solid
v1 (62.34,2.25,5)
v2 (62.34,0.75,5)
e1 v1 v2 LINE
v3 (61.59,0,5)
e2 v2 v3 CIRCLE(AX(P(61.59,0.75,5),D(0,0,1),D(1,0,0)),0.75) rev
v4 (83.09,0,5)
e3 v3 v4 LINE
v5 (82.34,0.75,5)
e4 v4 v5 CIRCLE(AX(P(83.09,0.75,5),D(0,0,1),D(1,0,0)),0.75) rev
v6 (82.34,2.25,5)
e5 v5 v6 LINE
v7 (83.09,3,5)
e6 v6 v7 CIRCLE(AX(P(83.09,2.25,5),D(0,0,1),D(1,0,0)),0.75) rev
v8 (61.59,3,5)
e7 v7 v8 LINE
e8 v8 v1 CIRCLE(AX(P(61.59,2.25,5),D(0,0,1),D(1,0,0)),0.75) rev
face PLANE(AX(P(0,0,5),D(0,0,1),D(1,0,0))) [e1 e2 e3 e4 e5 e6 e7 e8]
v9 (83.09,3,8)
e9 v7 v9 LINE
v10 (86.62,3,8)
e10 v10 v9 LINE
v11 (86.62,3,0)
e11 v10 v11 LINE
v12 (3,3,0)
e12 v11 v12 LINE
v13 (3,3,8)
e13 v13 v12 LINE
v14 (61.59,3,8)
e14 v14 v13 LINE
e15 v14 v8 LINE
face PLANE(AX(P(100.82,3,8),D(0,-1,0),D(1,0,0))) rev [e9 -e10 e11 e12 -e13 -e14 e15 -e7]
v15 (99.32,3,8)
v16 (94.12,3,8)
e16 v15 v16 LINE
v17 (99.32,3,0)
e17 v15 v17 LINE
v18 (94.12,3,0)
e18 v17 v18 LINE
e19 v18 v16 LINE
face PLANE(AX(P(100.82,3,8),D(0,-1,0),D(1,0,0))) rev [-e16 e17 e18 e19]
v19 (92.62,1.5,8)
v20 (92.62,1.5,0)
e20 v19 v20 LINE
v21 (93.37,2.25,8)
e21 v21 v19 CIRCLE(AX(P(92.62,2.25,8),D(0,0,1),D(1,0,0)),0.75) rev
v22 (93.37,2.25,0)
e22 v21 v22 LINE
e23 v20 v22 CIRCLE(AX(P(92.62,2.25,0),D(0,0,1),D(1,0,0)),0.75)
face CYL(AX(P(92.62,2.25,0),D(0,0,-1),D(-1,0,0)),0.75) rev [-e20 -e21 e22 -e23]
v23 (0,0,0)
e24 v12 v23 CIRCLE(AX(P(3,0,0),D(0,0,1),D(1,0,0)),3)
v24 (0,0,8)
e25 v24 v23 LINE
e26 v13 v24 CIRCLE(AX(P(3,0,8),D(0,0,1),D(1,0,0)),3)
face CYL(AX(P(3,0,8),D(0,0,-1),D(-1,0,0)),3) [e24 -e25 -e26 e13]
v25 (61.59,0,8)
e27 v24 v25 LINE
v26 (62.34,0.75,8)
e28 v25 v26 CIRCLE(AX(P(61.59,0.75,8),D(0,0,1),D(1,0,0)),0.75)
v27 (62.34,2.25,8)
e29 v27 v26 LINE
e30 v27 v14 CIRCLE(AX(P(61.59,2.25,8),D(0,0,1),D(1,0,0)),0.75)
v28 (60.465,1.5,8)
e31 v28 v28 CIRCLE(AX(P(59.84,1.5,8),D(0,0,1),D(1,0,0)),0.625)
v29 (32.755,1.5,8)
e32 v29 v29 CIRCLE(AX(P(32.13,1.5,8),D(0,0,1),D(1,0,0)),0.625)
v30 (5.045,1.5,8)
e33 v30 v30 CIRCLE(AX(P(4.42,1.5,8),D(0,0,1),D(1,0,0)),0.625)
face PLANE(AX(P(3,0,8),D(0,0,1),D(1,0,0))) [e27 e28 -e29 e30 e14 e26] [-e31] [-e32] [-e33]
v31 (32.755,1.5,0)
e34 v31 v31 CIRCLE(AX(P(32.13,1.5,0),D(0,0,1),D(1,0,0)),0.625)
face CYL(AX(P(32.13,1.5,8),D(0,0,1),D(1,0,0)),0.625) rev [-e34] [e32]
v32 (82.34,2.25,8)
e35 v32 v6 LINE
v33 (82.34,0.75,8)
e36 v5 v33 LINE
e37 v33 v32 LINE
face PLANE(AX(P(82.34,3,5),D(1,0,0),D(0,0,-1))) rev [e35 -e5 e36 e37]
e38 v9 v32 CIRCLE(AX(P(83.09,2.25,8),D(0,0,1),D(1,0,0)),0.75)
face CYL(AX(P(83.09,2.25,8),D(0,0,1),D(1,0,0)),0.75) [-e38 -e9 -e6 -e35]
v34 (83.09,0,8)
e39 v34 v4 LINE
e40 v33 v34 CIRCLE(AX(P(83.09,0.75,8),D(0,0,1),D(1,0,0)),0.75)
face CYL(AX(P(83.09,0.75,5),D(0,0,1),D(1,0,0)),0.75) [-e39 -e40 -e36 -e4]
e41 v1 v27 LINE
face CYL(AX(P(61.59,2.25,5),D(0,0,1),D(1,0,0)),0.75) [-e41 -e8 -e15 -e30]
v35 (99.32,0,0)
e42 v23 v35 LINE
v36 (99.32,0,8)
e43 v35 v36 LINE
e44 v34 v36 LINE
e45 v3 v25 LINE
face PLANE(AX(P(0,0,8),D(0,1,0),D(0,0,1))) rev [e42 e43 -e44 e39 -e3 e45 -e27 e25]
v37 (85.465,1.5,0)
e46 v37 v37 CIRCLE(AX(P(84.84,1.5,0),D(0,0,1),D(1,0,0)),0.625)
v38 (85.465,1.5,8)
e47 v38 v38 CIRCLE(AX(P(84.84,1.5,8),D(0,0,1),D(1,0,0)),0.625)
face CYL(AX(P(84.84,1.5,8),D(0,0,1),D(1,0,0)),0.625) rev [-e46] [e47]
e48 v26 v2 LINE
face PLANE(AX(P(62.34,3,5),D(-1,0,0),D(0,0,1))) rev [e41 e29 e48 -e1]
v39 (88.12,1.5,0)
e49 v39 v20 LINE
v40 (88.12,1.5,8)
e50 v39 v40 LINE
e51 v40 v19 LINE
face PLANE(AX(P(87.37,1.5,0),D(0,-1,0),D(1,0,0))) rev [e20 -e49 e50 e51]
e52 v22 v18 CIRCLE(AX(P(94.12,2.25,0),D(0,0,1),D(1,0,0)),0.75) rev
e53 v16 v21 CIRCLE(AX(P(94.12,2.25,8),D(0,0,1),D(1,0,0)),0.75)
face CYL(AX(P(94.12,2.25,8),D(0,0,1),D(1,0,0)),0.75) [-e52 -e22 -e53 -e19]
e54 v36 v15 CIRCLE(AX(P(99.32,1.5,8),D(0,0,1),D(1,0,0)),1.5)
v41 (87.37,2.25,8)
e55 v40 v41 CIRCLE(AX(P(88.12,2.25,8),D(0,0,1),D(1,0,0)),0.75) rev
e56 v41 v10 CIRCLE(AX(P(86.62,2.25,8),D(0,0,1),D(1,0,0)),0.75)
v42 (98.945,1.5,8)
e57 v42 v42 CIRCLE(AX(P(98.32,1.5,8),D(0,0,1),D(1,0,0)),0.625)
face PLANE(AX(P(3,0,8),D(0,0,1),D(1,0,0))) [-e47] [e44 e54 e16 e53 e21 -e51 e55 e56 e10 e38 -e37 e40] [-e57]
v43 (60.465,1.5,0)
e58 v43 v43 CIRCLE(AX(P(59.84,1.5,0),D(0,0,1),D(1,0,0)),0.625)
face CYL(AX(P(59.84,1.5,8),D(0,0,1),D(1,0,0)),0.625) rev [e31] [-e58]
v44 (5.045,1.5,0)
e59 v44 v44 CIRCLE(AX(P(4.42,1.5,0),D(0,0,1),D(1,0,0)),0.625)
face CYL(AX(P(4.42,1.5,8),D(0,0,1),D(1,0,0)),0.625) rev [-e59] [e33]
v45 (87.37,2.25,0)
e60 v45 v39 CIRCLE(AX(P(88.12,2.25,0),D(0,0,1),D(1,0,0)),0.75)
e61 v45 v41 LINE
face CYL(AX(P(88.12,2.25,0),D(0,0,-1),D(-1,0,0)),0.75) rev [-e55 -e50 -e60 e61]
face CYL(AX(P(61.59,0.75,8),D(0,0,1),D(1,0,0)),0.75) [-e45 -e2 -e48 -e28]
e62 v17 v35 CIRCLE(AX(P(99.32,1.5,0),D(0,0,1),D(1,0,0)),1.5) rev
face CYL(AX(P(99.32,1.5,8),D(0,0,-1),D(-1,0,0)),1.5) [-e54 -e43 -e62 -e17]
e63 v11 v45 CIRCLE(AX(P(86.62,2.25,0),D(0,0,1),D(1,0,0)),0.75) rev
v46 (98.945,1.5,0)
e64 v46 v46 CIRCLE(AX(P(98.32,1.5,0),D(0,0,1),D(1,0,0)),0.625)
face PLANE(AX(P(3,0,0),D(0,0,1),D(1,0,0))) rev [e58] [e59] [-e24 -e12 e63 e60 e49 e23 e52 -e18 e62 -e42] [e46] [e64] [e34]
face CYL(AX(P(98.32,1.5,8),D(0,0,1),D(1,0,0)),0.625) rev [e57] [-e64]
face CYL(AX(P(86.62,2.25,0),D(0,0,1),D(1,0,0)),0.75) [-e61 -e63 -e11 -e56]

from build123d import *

# Parameters (mm, degrees)
EXTRUDE_854_DEPTH      = 8
SKETCH_2_W             = 20
SKETCH_2_H             = 3
CUT_EXTRUDE_1137_DEPTH = 3
HOLE_WIZARD_1_6_D      = 1.25
SKETCH_7_W             = 6
SKETCH_7_H             = 1.5
CUT_EXTRUDE_2764_DEPTH = 102.181383663
FILLET_2_RADIUS        = 1.5
FILLET_2_LENGTH        = 8
FILLET_3_R             = 0.75


with BuildPart() as part:
    # Model → Extrude 854 (new body)
    with BuildSketch(Plane.XY):
        with BuildLine():
            Line((100.82, 3), (3, 3))
            ThreePointArc((3, 3), (0.878679656, 2.121320344), (0, 0))
            Line((0, 0), (100.82, 0))
            Line((100.82, 0), (100.82, 3))
        make_face()
    extrude(amount=EXTRUDE_854_DEPTH)

    # Эскиз2 → Cut-Extrude 1137 (cut)
    with BuildSketch(Plane.XY.offset(8)):
        with Locations((72.34, 1.5)):
            Rectangle(SKETCH_2_W, SKETCH_2_H)
    extrude(amount=-CUT_EXTRUDE_1137_DEPTH, mode=Mode.SUBTRACT)

    # Резьба М1.6 (through all)
    with Locations(Plane.XY.offset(8)):
        with Locations((4.42, 1.5), (59.84, 1.5), (84.84, 1.5), (98.32, 1.5), (32.13, 1.5)):
            Hole(HOLE_WIZARD_1_6_D / 2)

    # Эскиз7 → Cut-Extrude 2764 (cut, through all)
    with BuildSketch(Plane.XY.offset(8)):
        with Locations((90.37, 2.25)):
            Rectangle(SKETCH_7_W, SKETCH_7_H)
    extrude(amount=-CUT_EXTRUDE_2764_DEPTH, mode=Mode.SUBTRACT)

    # Скругление2: full round fillet: the end face becomes a half cylinder, R = half its width
    fillet_2_face = Plane((100.82, 1.5, 4), x_dir=(0, 0, 1), z_dir=(1, 0, 0))  # on the end face: x along it, z out of the body
    fillet_2_slab = fillet_2_face.offset(-FILLET_2_RADIUS / 2) * Box(FILLET_2_LENGTH, 2 * FILLET_2_RADIUS, FILLET_2_RADIUS, mode=Mode.PRIVATE)  # the body's end, R deep
    fillet_2_round = Plane((99.32, 1.5, 4), x_dir=(1, 0, 0), z_dir=(0, 0, 1)) * Cylinder(FILLET_2_RADIUS, FILLET_2_LENGTH, mode=Mode.PRIVATE)  # its axis R under the face
    add(fillet_2_slab - fillet_2_round, mode=Mode.SUBTRACT)

    # Скругление3
    fillet_3_edges = [part.edges().sort_by_distance(p)[0] for p in [
        (62.34, 0, 6.5),
        (82.34, 0, 6.5),
        (93.37, 1.5, 4),
        (93.37, 3, 4),
        (87.37, 1.5, 4),
        (87.37, 3, 4),
        (82.34, 3, 6.5),
        (62.34, 3, 6.5),
    ]]
    fillet(fillet_3_edges, radius=FILLET_3_R - 0.0001)  # a hair under: the kernel refuses the full size


solid = part.part
